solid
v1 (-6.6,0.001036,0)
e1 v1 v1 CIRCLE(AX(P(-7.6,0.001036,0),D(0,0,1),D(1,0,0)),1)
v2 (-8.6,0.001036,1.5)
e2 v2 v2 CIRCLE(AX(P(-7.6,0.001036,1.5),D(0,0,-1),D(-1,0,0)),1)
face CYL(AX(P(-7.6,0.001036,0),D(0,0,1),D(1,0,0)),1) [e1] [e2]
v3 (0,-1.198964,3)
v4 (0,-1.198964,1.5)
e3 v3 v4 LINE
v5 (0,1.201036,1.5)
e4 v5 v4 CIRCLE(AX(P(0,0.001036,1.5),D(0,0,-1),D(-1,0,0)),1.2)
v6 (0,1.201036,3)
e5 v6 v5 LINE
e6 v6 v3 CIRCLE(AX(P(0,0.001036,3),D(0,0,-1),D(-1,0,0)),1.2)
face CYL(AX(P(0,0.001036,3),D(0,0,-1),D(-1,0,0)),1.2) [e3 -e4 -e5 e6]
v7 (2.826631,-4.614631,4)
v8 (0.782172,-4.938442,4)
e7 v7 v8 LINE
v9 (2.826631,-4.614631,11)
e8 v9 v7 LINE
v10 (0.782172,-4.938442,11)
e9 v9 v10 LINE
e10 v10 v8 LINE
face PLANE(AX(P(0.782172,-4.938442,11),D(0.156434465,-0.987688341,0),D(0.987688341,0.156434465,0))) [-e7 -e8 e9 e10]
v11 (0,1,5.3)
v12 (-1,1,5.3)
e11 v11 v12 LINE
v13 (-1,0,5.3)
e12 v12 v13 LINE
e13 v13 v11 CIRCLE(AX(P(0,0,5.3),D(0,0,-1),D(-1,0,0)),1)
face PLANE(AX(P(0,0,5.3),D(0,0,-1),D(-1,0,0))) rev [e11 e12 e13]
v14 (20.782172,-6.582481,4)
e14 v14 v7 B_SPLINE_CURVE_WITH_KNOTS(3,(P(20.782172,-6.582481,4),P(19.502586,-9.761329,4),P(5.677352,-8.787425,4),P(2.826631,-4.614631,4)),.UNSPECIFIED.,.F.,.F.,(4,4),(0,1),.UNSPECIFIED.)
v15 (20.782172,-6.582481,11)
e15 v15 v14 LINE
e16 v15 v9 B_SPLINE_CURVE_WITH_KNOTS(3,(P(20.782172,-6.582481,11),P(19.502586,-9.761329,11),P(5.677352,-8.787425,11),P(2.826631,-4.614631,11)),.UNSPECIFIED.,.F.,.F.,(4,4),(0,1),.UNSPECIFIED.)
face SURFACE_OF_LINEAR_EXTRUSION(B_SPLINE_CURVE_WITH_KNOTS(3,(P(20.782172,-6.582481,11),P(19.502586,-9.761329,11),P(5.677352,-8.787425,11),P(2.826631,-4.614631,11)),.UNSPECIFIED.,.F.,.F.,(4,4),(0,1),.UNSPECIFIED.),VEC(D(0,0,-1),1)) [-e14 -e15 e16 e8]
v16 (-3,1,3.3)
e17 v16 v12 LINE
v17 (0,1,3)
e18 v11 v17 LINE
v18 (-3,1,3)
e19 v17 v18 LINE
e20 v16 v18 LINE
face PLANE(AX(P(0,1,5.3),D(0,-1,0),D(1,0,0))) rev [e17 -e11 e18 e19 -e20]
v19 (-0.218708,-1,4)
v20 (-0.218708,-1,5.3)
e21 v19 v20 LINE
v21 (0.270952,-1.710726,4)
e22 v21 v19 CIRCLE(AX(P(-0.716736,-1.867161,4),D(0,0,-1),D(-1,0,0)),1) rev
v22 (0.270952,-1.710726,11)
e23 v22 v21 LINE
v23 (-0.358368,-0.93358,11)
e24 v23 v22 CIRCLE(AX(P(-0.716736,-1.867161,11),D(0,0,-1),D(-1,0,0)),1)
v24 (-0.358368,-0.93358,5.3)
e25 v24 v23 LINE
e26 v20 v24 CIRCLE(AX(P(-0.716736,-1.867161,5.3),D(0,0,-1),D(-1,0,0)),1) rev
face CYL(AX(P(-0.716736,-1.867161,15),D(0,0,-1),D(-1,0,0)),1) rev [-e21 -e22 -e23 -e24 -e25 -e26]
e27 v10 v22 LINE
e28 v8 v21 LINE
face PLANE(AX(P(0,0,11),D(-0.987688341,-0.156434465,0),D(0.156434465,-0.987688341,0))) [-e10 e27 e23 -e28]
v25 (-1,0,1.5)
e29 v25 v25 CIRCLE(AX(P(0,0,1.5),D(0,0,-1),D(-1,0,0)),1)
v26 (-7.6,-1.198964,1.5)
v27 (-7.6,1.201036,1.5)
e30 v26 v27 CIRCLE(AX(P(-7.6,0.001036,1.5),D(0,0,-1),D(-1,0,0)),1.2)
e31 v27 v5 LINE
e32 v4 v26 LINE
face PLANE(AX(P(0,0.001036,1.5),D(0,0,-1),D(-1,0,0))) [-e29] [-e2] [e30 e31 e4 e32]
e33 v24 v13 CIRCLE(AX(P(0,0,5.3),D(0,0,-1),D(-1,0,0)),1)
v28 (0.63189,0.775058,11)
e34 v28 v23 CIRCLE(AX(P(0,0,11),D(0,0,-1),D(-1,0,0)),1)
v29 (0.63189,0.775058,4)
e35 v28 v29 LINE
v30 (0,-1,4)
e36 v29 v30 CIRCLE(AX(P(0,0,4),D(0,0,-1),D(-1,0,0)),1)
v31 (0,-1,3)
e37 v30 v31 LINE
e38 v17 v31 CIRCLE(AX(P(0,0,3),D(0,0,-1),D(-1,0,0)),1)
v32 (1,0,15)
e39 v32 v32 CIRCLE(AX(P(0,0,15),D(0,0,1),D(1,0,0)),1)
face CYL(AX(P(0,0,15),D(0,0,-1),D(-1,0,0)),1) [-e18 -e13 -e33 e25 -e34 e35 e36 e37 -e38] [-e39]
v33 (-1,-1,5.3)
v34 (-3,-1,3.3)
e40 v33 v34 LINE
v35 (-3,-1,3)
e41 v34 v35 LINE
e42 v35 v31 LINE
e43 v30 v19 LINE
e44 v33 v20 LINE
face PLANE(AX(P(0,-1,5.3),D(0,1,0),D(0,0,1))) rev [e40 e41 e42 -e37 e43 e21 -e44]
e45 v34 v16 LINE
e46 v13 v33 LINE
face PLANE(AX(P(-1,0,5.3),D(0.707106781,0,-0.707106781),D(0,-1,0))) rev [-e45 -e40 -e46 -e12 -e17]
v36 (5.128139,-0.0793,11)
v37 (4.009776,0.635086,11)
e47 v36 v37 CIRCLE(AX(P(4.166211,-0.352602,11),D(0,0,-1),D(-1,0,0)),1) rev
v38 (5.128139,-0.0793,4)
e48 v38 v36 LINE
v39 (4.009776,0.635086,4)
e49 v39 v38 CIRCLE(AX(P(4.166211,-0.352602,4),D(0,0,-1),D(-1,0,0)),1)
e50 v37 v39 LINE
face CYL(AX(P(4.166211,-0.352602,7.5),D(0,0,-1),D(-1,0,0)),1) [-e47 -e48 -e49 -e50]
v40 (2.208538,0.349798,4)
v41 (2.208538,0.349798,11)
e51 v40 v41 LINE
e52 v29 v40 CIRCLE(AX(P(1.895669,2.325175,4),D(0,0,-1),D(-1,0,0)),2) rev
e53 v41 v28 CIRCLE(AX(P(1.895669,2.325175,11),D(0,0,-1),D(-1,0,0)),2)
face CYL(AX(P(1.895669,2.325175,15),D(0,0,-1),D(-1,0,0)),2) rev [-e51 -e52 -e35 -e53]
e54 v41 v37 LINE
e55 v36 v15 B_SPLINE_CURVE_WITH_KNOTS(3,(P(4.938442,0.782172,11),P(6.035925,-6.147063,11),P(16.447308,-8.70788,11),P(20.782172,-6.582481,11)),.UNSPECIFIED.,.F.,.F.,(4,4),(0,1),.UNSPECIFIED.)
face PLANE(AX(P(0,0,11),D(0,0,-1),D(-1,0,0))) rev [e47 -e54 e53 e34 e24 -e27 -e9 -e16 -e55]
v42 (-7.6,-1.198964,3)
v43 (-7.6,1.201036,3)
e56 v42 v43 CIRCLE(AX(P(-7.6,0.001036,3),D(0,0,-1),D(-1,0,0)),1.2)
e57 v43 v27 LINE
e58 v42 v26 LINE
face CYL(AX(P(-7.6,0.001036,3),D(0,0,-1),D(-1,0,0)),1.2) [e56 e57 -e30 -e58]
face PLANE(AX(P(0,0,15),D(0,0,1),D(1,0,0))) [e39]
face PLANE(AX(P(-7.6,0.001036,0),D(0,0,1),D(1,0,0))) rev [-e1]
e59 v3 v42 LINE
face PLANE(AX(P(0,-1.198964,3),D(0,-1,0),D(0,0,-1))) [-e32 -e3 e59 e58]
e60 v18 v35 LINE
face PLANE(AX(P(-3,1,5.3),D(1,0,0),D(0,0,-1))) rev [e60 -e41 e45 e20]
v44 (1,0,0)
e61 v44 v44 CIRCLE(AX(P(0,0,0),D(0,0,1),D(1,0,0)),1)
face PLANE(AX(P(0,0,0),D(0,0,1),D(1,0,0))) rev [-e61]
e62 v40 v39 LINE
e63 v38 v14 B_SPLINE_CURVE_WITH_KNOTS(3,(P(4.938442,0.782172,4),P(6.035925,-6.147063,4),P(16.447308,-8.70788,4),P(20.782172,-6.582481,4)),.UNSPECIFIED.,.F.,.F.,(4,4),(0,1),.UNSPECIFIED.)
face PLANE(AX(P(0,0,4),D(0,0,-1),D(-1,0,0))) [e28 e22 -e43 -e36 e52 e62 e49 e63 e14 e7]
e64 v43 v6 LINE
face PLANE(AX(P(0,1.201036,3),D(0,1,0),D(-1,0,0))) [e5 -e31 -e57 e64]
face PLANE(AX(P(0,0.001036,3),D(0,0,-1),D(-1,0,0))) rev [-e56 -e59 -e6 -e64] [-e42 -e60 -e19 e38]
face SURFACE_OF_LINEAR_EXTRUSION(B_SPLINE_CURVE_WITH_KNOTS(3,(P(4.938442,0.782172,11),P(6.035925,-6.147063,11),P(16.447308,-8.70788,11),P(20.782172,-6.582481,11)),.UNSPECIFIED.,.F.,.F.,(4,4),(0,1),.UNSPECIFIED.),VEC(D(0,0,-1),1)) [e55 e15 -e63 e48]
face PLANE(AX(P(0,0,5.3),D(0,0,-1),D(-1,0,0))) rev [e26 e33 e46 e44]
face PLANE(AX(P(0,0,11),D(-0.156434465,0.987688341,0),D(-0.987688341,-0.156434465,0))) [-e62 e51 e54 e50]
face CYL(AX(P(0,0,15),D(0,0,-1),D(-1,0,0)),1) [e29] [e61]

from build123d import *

# Parameters (mm, degrees)
SKETCH_1_R      = 1
EXTRUDE_1_DEPTH = 15
EXTRUDE_2_DEPTH = 1.5
SKETCH_3_R      = 1
EXTRUDE_3_DEPTH = 3
SKETCH_4_W      = 3
SKETCH_4_H      = 2
EXTRUDE_4_DEPTH = 2.3
EXTRUDE_5_DEPTH = 7
EXTRUDE_6_DEPTH = 7
FILLET_1_R      = 1
FILLET_2_R      = 1
FILLET_3_R      = 2
CHAMFER_2_SIZE  = 2


# Some blends are built 0.0001 mm under size
with BuildPart() as part:
    # Эскиз1 → Бобышка-Вытянуть1 (new body)
    with BuildSketch(Plane.XY):
        Circle(SKETCH_1_R)
    extrude(amount=EXTRUDE_1_DEPTH)

    # Эскиз2 → Бобышка-Вытянуть2 (add)
    with BuildSketch(Plane(origin=(0, 0, 1.5), x_dir=(-1, 0, 0), z_dir=(0, 0, -1))):
        with BuildLine():
            Line((0, 1.201036303), (7.6, 1.201036303))
            ThreePointArc((7.6, 1.201036303), (8.8, 0.001036303), (7.6, -1.198963697))
            Line((7.6, -1.198963697), (0, -1.198963697))
            ThreePointArc((0, -1.198963697), (-1.2, 0.001036303), (0, 1.201036303))
        make_face()
    extrude(amount=-EXTRUDE_2_DEPTH)

    # Эскиз3 → Бобышка-Вытянуть3 (add)
    with BuildSketch(Plane.XY.offset(3)):
        with Locations((-7.6, 0.001036303)):
            Circle(SKETCH_3_R)
    extrude(amount=-EXTRUDE_3_DEPTH)

    # Эскиз4 → Бобышка-Вытянуть4 (add)
    with BuildSketch(Plane.XY.offset(3)):
        with Locations((-1.5, 0)):
            Rectangle(SKETCH_4_W, SKETCH_4_H)
    extrude(amount=EXTRUDE_4_DEPTH)

    # Эскиз5 → Бобышка-Вытянуть5 (add)
    with BuildSketch(Plane(origin=(0, 0, 4), x_dir=(-1, 0, 0), z_dir=(0, 0, -1))):
        Polygon((0, 0), (-0.782172325, -4.938441703), (-5.720614028, -4.156269378), (-4.938441703, 0.782172325), align=None)
    extrude(amount=-EXTRUDE_5_DEPTH)

    # Эскиз6 → Бобышка-Вытянуть6 (add)
    with BuildSketch(Plane(origin=(0, 0, 4), x_dir=(-1, 0, 0), z_dir=(0, 0, -1))):
        with BuildLine():
            Line((-0.987688341, 0.156434465), (-4.938441703, 0.782172325))
            add(Edge.make_bspline(
                [(-4.938441703, 0.782172325), (-6.035924713, -6.147062691), (-16.447307855, -8.707880394), (-20.782172325, -6.582481038)],
                knots=[0, 0, 0, 0, 1, 1, 1, 1], degree=3))
            add(Edge.make_bspline(
                [(-20.782172325, -6.582481038), (-19.502585952, -9.761328662), (-5.677351674, -8.787425093), (-2.826630593, -4.614631324)],
                knots=[0, 0, 0, 0, 1, 1, 1, 1], degree=3))
            Line((-2.826630593, -4.614631324), (-0.782172325, -4.938441703))
            Line((-0.782172325, -4.938441703), (-0.156434465, -0.987688341))
            ThreePointArc((-0.156434465, -0.987688341), (-0.809016994, -0.587785252), (-0.987688341, 0.156434465))
        make_face()
    extrude(amount=-EXTRUDE_6_DEPTH)

    # Скругление1
    fillet_1_edges = [part.edges().sort_by_distance(p)[0] for p in [
        (4.938441703, 0.782172325, 7.5),
    ]]
    fillet(fillet_1_edges, radius=FILLET_1_R)

    # Скругление2
    # the kernel refuses this fillet: 1 mm, written as the material it adds along each edge
    with BuildSketch(Plane(origin=(0.156434465, -0.987688341, 11), x_dir=(-0.9945218953682737, 0.10452846326764978, 0), z_dir=(0, 0, -1))) as fillet_2_piece_1:
        with BuildLine():
            CenterArc((0.776457135, -0.965925826), FILLET_2_R, 105, 60)
            Line((-0.189468691, -0.707106781), (-0.208787208, -0.7019304))
            Line((-0.208787208, -0.7019304), (-0.019318517, 0.005176381))
            Line((-0.019318517, 0.005176381), (0.005176381, 0.019318517))
            ThreePointArc((0.005176381, 0.019318517), (0.258819045, -0.014074174), (0.512461709, 0.019318517))
            Line((0.512461709, 0.019318517), (0.51763809, 0))
        make_face()
    extrude(amount=7)

    # Скругление3
    fillet_3_edges = [part.edges().sort_by_distance(p)[0] for p in [
        (0.987688341, 0.156434465, 7.5),
    ]]
    fillet(fillet_3_edges, radius=FILLET_3_R)

    # Фаска2
    chamfer_2_edges = [part.edges().sort_by_distance(p)[0] for p in [
        (-3, 0, 5.3),
    ]]
    chamfer(chamfer_2_edges, length=CHAMFER_2_SIZE - 0.0001)  # a hair under: the kernel refuses the full size


solid = part.part
